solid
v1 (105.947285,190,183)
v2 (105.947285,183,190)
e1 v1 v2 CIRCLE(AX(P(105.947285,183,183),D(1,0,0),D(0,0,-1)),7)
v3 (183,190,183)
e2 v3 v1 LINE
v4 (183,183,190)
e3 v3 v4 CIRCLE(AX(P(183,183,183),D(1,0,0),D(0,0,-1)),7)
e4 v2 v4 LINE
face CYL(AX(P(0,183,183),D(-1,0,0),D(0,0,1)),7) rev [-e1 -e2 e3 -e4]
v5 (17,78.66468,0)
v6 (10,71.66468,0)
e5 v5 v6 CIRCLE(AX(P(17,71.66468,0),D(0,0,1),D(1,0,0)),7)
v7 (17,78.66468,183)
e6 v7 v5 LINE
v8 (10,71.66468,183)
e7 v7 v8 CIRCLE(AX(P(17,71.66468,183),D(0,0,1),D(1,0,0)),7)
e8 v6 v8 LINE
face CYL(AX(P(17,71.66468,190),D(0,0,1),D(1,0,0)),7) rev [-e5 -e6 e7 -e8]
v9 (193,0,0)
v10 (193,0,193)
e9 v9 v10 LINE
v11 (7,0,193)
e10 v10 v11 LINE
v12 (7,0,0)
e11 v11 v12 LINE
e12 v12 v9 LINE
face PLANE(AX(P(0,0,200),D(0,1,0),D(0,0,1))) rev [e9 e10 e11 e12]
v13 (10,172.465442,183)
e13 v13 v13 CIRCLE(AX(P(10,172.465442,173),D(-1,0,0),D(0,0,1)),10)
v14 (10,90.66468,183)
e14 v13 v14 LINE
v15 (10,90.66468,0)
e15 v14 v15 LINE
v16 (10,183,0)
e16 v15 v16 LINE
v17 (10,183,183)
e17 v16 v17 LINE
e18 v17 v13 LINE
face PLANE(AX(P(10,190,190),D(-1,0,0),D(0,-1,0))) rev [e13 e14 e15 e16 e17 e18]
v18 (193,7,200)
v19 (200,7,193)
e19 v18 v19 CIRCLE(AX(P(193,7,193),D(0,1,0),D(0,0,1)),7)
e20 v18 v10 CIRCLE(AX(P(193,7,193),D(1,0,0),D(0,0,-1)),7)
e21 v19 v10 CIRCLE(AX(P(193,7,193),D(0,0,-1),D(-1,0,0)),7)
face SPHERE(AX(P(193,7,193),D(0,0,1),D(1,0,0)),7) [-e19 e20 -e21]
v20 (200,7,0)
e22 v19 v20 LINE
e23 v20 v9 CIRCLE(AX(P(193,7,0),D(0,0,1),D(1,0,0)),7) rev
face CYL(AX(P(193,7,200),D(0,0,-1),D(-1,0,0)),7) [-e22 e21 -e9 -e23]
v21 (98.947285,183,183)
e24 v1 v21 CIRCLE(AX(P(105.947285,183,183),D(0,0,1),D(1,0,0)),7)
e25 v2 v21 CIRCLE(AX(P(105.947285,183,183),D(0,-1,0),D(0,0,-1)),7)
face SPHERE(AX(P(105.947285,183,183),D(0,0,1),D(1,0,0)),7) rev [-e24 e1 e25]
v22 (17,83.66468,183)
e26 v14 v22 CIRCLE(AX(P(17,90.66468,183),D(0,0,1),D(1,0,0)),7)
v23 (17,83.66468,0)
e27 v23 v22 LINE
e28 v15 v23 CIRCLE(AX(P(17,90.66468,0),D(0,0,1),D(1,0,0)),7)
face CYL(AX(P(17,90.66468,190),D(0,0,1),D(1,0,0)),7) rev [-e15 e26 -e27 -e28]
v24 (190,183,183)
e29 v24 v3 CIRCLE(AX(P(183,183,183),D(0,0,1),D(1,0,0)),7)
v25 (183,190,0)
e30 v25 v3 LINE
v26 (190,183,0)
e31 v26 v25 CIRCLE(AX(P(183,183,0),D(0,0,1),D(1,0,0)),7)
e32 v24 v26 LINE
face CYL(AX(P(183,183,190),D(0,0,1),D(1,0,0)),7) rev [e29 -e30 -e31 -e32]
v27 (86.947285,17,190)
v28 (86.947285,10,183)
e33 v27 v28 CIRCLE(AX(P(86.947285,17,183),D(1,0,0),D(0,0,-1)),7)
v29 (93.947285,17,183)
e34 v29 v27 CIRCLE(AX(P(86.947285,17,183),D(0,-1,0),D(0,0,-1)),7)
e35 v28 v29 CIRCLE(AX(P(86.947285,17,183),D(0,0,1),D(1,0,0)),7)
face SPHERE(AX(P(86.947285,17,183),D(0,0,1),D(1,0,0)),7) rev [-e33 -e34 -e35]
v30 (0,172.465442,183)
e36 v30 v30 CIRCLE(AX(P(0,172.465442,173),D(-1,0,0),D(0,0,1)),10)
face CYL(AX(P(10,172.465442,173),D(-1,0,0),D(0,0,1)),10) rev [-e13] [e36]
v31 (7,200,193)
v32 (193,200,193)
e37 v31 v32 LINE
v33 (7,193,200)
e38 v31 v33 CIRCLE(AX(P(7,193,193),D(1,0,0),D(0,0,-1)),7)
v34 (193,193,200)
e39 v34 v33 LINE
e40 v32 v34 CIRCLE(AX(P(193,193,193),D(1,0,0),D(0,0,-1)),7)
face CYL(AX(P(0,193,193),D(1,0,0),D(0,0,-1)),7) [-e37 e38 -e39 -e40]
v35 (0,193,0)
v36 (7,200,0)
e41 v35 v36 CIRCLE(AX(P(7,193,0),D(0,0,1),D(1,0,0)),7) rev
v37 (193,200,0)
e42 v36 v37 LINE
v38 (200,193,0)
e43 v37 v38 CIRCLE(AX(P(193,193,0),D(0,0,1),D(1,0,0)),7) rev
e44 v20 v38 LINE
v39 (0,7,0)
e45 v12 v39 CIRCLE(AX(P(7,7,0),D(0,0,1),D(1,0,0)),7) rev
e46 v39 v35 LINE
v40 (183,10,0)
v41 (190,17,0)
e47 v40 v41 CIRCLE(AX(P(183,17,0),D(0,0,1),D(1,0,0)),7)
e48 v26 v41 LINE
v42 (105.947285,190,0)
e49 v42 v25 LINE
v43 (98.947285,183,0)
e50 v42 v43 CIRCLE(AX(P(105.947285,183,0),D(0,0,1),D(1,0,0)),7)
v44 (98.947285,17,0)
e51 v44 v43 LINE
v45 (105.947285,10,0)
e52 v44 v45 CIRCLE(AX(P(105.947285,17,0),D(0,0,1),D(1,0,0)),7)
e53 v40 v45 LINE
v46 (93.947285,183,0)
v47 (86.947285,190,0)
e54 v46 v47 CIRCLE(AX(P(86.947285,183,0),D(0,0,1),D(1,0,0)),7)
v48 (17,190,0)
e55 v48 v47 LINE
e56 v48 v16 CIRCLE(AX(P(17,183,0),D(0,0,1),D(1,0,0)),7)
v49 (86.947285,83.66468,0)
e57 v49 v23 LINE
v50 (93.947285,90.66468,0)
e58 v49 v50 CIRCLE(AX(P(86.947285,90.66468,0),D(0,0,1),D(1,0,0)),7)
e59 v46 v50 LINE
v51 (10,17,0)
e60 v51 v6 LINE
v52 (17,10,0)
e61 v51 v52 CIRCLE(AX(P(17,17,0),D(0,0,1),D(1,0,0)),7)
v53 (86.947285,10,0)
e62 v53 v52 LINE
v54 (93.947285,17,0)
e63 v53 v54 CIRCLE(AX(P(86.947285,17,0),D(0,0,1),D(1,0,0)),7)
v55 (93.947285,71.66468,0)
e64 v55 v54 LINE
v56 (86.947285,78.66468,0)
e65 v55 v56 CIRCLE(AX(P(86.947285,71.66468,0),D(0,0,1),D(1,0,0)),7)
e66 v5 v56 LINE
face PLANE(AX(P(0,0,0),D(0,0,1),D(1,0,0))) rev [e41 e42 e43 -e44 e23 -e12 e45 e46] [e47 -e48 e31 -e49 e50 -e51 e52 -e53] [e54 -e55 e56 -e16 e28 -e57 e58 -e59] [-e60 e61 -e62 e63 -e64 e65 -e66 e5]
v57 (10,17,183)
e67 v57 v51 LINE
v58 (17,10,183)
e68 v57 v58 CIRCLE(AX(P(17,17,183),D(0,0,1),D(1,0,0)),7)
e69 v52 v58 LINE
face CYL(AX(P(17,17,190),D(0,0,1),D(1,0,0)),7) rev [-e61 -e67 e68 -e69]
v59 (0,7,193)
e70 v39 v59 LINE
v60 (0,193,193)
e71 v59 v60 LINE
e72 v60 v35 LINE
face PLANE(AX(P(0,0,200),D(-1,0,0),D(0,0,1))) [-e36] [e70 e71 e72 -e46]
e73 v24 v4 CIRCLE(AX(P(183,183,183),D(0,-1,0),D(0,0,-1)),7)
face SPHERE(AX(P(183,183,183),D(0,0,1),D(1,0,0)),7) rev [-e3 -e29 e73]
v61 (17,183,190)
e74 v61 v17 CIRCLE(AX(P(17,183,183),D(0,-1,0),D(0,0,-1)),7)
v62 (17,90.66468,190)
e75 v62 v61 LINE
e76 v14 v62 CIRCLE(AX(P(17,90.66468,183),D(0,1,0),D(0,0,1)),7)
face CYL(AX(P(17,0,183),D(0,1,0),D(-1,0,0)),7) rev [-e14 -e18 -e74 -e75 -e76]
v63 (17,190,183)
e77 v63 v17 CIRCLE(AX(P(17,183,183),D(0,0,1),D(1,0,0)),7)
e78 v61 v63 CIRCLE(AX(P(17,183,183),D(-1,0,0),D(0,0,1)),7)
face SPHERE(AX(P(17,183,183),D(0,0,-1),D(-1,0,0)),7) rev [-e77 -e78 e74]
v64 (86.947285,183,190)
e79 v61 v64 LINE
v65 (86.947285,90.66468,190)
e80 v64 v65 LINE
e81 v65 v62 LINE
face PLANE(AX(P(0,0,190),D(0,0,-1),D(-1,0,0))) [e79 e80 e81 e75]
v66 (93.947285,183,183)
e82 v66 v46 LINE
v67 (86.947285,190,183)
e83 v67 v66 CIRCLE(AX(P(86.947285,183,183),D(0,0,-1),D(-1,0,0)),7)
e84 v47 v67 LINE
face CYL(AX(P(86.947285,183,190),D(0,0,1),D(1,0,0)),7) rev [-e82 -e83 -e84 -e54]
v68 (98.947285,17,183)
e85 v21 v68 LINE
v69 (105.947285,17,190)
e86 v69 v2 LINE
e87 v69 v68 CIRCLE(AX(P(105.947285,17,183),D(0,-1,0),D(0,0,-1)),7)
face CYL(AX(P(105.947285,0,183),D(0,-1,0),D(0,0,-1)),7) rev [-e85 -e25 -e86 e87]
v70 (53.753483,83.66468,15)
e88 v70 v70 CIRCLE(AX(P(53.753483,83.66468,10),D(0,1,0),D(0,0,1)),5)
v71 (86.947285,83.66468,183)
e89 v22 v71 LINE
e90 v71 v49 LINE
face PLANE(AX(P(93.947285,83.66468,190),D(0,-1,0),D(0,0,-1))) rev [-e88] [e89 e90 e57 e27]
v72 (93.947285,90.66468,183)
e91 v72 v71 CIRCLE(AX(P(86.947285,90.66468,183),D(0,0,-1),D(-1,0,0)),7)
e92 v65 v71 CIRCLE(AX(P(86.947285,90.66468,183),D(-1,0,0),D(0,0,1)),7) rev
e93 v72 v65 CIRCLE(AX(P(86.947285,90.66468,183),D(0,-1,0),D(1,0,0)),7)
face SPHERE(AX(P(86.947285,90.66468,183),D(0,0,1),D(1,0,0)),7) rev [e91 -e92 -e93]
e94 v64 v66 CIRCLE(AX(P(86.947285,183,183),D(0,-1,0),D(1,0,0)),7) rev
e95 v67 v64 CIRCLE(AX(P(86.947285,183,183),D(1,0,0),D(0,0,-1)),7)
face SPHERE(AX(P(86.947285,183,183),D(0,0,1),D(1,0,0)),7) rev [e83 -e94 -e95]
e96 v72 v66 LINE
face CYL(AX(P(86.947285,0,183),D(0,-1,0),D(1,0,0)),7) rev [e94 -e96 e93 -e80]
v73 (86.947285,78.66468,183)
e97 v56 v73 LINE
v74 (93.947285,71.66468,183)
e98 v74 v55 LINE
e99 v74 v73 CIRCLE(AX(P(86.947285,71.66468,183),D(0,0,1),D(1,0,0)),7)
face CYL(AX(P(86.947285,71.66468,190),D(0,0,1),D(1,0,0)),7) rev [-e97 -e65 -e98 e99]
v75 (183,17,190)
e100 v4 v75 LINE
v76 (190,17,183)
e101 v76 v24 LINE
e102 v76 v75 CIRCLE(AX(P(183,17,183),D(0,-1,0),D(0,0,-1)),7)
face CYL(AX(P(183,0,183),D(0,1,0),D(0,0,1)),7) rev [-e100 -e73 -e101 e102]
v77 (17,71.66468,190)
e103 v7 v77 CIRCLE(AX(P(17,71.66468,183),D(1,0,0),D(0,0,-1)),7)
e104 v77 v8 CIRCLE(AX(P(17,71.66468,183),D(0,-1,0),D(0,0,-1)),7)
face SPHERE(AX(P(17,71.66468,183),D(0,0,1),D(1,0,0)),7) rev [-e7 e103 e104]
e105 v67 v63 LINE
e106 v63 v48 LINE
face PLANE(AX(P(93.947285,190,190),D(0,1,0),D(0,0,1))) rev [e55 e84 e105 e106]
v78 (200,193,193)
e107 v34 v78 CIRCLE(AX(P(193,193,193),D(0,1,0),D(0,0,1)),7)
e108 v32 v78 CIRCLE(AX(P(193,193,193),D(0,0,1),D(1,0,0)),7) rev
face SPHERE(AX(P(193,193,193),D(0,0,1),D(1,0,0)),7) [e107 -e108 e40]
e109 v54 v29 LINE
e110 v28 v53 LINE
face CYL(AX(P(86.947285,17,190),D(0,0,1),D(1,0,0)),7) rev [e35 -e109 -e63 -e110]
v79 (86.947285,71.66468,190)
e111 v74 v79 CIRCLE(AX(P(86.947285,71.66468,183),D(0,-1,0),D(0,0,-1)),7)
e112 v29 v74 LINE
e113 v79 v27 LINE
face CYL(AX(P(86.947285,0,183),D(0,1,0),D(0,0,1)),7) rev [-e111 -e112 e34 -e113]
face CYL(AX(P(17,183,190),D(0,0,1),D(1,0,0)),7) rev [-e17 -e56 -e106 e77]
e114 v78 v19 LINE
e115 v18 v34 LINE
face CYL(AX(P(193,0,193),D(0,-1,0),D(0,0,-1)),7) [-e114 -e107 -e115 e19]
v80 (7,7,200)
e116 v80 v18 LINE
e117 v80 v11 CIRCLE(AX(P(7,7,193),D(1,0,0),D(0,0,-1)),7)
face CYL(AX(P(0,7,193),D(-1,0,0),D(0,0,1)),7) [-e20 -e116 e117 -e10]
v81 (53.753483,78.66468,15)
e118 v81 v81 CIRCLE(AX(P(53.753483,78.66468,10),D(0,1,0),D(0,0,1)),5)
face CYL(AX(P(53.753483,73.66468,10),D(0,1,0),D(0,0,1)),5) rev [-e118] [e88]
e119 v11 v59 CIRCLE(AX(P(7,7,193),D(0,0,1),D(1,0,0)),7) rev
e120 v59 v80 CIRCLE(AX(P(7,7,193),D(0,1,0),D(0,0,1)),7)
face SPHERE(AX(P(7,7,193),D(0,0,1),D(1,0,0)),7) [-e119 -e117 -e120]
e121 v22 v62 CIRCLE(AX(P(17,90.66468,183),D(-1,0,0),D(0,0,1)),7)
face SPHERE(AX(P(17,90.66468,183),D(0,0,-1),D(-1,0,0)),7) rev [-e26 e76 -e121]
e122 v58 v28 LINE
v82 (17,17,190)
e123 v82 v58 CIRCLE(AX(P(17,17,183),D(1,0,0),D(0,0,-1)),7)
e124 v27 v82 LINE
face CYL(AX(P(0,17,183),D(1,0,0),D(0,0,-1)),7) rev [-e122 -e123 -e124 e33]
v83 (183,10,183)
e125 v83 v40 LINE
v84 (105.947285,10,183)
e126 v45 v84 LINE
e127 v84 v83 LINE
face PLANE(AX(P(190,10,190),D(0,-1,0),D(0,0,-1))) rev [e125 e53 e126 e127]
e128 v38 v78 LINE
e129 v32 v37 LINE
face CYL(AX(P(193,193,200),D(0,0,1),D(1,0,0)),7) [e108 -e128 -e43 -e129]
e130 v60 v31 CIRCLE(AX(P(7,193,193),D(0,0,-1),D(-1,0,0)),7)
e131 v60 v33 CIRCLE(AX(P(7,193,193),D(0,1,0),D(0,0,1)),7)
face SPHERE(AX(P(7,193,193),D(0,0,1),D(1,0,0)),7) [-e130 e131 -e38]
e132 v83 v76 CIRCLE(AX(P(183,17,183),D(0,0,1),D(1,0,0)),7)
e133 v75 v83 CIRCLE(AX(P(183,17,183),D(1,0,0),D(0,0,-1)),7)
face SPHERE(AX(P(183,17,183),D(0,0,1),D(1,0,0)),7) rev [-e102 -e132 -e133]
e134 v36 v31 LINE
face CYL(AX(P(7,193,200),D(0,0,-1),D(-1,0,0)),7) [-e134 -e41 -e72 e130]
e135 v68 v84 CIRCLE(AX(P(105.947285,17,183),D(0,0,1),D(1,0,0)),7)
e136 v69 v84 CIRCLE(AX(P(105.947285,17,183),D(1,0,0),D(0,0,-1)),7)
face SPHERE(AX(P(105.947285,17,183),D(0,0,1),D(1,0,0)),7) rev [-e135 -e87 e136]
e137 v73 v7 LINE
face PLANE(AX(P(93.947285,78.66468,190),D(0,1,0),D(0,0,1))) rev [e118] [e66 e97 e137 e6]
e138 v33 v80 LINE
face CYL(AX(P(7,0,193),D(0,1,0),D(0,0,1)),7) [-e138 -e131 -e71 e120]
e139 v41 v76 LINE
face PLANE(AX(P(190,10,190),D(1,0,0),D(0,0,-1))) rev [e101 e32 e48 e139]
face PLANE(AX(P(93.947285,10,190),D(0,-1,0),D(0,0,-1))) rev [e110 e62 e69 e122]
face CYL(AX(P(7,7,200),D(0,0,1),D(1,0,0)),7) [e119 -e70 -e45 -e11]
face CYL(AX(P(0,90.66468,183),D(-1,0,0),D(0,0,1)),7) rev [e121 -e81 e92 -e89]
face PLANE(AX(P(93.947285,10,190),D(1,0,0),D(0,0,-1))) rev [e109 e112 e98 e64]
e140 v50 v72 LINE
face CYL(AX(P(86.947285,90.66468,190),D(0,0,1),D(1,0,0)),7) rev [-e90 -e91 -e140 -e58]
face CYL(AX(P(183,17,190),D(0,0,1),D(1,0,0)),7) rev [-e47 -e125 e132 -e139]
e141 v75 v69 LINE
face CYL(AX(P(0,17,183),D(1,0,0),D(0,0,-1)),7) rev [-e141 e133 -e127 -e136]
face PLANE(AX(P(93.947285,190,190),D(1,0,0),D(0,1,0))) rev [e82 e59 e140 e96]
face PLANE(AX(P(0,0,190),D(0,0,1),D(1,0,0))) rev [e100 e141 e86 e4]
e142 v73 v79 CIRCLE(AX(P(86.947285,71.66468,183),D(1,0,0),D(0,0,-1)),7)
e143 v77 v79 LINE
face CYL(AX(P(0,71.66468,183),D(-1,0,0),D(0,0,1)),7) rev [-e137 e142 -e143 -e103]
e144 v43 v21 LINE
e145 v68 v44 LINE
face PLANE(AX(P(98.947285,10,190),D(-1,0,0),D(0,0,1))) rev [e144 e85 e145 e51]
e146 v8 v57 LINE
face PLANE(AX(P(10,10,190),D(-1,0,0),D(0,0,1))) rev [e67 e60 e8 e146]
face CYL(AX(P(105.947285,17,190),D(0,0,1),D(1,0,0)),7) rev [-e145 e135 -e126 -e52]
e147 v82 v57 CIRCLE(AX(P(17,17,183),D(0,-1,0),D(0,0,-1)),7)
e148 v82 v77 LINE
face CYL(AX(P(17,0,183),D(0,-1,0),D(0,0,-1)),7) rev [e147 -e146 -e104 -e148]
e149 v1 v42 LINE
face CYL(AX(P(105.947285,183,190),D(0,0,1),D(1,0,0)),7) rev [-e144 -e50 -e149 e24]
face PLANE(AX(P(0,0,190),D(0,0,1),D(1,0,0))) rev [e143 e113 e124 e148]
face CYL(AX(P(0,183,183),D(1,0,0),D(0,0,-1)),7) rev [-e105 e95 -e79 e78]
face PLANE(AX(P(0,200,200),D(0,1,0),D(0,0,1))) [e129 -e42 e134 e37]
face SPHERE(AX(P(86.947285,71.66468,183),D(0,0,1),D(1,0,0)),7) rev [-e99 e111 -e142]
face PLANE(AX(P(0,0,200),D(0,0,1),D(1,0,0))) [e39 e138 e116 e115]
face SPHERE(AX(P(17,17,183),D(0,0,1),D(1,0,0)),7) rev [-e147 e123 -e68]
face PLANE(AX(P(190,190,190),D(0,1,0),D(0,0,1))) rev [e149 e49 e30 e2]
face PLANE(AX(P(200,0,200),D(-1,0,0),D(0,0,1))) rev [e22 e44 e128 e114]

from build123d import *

# Parameters (mm, degrees)
ESBO_O1_W                = 200
ESBO_O1_H                = 200
RESSALTO_EXTRUS_O2_DEPTH = 200
ESBO_O4_W                = 91.052715104
ESBO_O4_H                = 180
ESBO_O4_W_2              = 83.947284896
ESBO_O4_H_2              = 68.664679647
ESBO_O4_H_3              = 106.335320353
CORTE_EXTRUS_O2_DEPTH    = 190
FILETE2_R                = 7
FILETE3_R                = 7
FILETE4_R                = 7
FILETE5_R                = 7
FILETE6_R                = 7
ESBO_O5_R                = 5
CORTE_EXTRUS_O3_DEPTH    = 10
ESBO_O6_R                = 10
CORTE_EXTRUS_O4_DEPTH    = 10


with BuildPart() as part:
    # Esboço1 → Ressalto-extrusão2 (new body)
    with BuildSketch(Plane.XY):
        with Locations((100, 100)):
            Rectangle(ESBO_O1_W, ESBO_O1_H)
    extrude(amount=RESSALTO_EXTRUS_O2_DEPTH)

    # Esboço4 → Corte-extrusão2 (cut)
    with BuildSketch(Plane(origin=(0, 0, 0), x_dir=(-1, 0, 0), z_dir=(0, 0, -1))):
        with Locations((-144.473642448, 100)):
            Rectangle(ESBO_O4_W, ESBO_O4_H)
        with Locations((-51.973642448, 44.332339823)):
            Rectangle(ESBO_O4_W_2, ESBO_O4_H_2)
        with Locations((-51.973642448, 136.832339824)):
            Rectangle(ESBO_O4_W_2, ESBO_O4_H_3)
    extrude(amount=-CORTE_EXTRUS_O2_DEPTH, mode=Mode.SUBTRACT)

    # Filete2
    filete2_edges = [part.edges().sort_by_distance(p)[0] for p in [
        (0, 0, 100),
        (0, 200, 100),
        (200, 200, 100),
        (200, 0, 100),
    ]]
    fillet(filete2_edges, radius=FILETE2_R)

    # Filete3
    filete3_edges = [part.edges().sort_by_distance(p)[0] for p in [
        (190, 10, 95),
        (190, 190, 95),
        (98.947284896, 190, 95),
        (98.947284896, 10, 95),
        (93.947284896, 10, 95),
        (93.947284896, 78.664679647, 95),
        (10, 78.664679647, 95),
        (10, 10, 95),
        (10, 190, 95),
        (10, 83.664679647, 95),
    ]]
    fillet(filete3_edges, radius=FILETE3_R)

    # Filete4
    filete4_edges = [part.edges().sort_by_distance(p)[0] for p in [
        (12.050252532, 187.949747468, 190),
        (12.050252532, 85.714932179, 190),
        (93.947284896, 136.832339824, 190),
        (55.473642448, 83.664679647, 190),
        (93.947284896, 44.332339824, 190),
        (51.973642448, 78.664679647, 190),
        (51.973642448, 10, 190),
        (10, 44.332339824, 190),
        (12.050252532, 12.050252532, 190),
        (12.050252532, 76.614427115, 190),
        (91.897032365, 12.050252532, 190),
        (91.897032365, 76.614427115, 190),
        (190, 100, 190),
        (144.473642448, 190, 190),
        (144.473642448, 10, 190),
        (98.947284896, 100, 190),
        (100.997537428, 187.949747468, 190),
        (100.997537428, 12.050252532, 190),
        (187.949747468, 12.050252532, 190),
        (187.949747468, 187.949747468, 190),
        (10, 136.832339824, 190),
        (55.473642448, 190, 190),
    ]]
    fillet(filete4_edges, radius=FILETE4_R)

    # Filete5
    filete5_edges = [part.edges().sort_by_distance(p)[0] for p in [
        (0, 100, 200),
        (100, 200, 200),
        (100, 0, 200),
        (200, 100, 200),
        (197.949747468, 2.050252532, 200),
        (2.050252532, 2.050252532, 200),
        (197.949747468, 197.949747468, 200),
        (2.050252532, 197.949747468, 200),
    ]]
    fillet(filete5_edges, radius=FILETE5_R)

    # Filete6
    # the kernel refuses this fillet: 7 mm, written as the material it adds along each edge
    with BuildSketch(Plane(origin=(86.947284896, 183, 183), x_dir=(1, 0, 0), z_dir=(0, 1, 0))) as filete6_piece_1_section:
        Polygon((0, 0), (FILETE6_R * 1.02, 0), (FILETE6_R * 1.02, -FILETE6_R * 1.02), (0, -FILETE6_R * 1.02), align=None)
    filete6_piece_1 = extrude(amount=FILETE6_R * 1.02, mode=Mode.PRIVATE)
    filete6_piece_1 = filete6_piece_1 - Plane(origin=(86.947284896, 183, 183), x_dir=(-0.7071067811865475, 0, -0.7071067811865475), z_dir=(0, 1, 0)) * Sphere(FILETE6_R, mode=Mode.PRIVATE)
    add(filete6_piece_1)
    with BuildSketch(Plane(origin=(86.947284896, 90.664679647, 183), x_dir=(0, -1, 0), z_dir=(1, 0, 0))) as filete6_piece_2_section:
        Polygon((0, 0), (FILETE6_R * 1.02, 0), (FILETE6_R * 1.02, -FILETE6_R * 1.02), (0, -FILETE6_R * 1.02), align=None)
    filete6_piece_2 = extrude(amount=FILETE6_R * 1.02, mode=Mode.PRIVATE)
    filete6_piece_2 = filete6_piece_2 - Plane(origin=(86.947284896, 90.664679647, 183), x_dir=(0, 0.7071067811865475, -0.7071067811865475), z_dir=(1, 0, 0)) * Sphere(FILETE6_R, mode=Mode.PRIVATE)
    add(filete6_piece_2)
    with BuildSketch(Plane(origin=(93.947284896, 83.664679647, 0), x_dir=(0, 1, 0), z_dir=(0, 0, 1)), Plane(origin=(93.947284896, 190, 0), x_dir=(-1, 0, 0), z_dir=(0, 0, 1))) as filete6_piece_3:
        with BuildLine():
            CenterArc((FILETE6_R, FILETE6_R), FILETE6_R, 180, 90)
            Line((0, FILETE6_R), (0, 0))
            Line((0, 0), (FILETE6_R, 0))
        make_face()
    extrude(amount=183)

    # Esboço5 → Corte-extrusão3 (cut)
    with BuildSketch(Plane(origin=(0, 83.664679647, 0), x_dir=(1, 0, 0), z_dir=(0, 1, 0))):
        with Locations(Location((53.753482912, -10, 0), (0, 0, 270))):
            Circle(ESBO_O5_R)
    extrude(amount=-CORTE_EXTRUS_O3_DEPTH, mode=Mode.SUBTRACT)

    # Esboço6 → Corte-extrusão4 (cut)
    with BuildSketch(Plane.ZY):
        with Locations((173, 172.46544245)):
            Circle(ESBO_O6_R)
    extrude(amount=-CORTE_EXTRUS_O4_DEPTH, mode=Mode.SUBTRACT)


solid = part.part
